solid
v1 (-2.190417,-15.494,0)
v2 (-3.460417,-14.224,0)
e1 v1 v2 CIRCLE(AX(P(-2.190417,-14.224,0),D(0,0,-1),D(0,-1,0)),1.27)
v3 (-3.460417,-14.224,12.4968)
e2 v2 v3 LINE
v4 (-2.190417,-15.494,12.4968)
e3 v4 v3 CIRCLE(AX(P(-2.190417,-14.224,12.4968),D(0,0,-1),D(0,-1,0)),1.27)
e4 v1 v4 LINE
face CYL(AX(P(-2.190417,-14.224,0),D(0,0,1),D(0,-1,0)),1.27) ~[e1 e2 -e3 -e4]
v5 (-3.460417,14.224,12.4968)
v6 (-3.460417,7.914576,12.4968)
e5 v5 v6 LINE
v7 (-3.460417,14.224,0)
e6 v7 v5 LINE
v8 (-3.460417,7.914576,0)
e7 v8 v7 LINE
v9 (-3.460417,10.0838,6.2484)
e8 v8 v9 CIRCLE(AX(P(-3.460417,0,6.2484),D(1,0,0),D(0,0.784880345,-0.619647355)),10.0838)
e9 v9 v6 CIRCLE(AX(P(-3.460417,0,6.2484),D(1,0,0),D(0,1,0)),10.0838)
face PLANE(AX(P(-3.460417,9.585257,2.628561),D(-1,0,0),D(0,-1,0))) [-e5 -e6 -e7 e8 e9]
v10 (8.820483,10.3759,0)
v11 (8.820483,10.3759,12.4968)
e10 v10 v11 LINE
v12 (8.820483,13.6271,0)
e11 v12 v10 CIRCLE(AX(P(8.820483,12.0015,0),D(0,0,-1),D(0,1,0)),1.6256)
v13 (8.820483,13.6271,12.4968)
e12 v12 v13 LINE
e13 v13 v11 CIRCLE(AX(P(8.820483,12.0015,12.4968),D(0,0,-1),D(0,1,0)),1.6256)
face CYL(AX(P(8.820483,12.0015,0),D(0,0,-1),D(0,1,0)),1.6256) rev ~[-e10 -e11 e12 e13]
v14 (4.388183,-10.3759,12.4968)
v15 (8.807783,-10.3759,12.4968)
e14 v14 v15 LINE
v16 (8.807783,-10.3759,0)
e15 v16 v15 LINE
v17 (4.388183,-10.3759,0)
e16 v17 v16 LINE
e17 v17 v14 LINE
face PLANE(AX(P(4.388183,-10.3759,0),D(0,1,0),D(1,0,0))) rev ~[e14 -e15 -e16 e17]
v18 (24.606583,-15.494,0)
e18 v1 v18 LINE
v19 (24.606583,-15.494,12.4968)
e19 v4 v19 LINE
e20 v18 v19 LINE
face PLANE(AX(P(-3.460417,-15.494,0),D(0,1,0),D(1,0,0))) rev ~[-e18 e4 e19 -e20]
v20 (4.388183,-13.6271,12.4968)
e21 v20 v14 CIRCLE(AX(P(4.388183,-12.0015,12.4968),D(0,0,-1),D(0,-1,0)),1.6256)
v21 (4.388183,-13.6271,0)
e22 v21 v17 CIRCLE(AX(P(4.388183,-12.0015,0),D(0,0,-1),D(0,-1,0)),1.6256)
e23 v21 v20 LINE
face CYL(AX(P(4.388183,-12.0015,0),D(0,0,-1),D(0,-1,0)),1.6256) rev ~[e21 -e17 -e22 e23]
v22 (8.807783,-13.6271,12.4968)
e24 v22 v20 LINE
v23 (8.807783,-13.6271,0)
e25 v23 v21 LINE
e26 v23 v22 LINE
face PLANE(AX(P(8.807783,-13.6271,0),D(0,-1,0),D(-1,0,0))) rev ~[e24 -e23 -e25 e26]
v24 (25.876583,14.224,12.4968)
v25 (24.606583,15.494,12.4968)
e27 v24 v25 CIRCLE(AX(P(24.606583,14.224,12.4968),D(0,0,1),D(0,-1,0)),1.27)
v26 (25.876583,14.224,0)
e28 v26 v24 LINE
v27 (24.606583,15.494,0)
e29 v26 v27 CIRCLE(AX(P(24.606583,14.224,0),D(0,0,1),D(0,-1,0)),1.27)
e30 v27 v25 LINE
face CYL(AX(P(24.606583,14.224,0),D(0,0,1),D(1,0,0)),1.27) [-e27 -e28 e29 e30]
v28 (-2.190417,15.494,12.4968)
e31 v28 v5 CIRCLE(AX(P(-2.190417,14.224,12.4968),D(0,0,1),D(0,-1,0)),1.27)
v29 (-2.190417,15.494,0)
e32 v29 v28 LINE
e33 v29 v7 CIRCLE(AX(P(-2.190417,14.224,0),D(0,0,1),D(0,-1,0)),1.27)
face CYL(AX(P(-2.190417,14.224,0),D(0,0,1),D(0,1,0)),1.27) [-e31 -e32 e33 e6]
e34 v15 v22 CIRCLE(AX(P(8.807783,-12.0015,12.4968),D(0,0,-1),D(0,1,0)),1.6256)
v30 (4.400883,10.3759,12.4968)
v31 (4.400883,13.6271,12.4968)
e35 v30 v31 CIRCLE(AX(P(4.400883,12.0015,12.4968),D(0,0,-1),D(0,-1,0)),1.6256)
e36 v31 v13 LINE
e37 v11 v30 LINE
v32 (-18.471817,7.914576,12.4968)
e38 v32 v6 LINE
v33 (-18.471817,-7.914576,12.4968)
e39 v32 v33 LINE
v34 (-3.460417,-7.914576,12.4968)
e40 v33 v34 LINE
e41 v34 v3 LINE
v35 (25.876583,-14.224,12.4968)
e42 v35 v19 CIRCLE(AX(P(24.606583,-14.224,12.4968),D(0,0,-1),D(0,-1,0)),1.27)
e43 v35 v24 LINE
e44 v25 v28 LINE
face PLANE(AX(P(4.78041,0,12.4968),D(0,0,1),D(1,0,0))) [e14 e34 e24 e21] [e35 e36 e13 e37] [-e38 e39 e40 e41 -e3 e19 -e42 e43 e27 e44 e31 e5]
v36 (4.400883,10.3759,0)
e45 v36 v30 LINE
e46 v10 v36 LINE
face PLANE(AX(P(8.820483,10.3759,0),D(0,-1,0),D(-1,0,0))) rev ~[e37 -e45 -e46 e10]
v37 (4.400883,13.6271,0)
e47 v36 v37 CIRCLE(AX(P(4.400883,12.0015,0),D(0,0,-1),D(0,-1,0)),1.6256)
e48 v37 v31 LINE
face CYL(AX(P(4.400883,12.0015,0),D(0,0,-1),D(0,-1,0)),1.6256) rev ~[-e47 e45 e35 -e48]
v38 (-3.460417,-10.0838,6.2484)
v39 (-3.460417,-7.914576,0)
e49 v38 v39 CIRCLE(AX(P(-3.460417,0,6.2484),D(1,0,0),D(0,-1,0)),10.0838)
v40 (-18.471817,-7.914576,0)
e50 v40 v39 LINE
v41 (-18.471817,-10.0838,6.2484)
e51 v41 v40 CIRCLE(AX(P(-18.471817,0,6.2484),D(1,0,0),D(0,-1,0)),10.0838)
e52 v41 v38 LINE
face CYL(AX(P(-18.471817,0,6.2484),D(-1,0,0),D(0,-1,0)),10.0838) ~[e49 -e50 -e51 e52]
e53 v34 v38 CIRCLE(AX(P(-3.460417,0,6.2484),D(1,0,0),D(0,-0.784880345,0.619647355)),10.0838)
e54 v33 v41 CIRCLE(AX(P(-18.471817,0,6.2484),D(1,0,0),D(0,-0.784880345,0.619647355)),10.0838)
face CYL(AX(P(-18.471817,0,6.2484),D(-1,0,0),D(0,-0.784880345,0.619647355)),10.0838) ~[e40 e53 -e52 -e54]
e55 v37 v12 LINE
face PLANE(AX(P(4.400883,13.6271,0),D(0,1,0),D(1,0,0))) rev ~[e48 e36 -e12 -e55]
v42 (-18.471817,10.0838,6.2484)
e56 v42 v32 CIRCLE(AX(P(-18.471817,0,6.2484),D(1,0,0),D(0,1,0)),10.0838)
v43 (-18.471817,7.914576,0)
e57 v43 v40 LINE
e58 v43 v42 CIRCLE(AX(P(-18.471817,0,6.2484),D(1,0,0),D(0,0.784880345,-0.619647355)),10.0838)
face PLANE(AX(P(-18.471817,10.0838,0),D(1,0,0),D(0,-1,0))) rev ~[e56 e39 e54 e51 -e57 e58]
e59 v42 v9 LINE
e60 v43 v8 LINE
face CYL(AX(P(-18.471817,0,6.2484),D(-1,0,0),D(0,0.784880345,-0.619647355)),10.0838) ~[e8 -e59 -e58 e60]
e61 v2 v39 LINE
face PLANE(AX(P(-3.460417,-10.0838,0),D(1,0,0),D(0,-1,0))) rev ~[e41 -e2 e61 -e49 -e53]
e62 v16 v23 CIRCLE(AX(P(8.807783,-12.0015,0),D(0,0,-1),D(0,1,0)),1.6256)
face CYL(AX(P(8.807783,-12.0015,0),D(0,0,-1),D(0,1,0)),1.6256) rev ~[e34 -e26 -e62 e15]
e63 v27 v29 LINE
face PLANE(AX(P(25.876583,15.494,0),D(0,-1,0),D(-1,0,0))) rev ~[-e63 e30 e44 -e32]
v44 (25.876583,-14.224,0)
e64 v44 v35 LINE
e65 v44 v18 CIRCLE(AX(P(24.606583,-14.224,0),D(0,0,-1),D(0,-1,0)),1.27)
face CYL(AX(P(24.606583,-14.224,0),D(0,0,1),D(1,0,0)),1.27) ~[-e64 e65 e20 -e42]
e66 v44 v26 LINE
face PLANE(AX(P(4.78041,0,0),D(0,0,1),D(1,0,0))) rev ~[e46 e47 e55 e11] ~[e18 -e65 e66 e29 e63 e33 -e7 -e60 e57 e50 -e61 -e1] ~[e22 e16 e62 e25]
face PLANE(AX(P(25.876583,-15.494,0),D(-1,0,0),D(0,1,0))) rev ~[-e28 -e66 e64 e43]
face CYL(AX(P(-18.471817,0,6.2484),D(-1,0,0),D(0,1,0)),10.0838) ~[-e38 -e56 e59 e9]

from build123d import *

# Parameters (mm, degrees)
F1_DEPTH = 12.4968
F3_R     = 1.27
F4_DEPTH = 15.0114


with BuildPart() as f1:
    # F0 (on Top) → F1 (new body)
    with BuildSketch(Plane.XY):
        Polygon((25.8765831087, -15.494), (25.8765831087, 15.494), (-3.4604168913, 15.494), (-3.4604168913, 10.0838), (-18.4718168913, 10.0838), (-18.4718168913, -10.0838), (-3.4604168913, -10.0838), (-3.4604168913, -15.494), align=None)
        with BuildLine():
            ThreePointArc((4.3881831087, -13.6271), (2.7625831087, -12.0015), (4.3881831087, -10.3759))
            Line((4.3881831087, -10.3759), (8.8077831087, -10.3759))
            ThreePointArc((8.8077831087, -10.3759), (10.4333831087, -12.0015), (8.8077831087, -13.6271))
            Line((8.8077831087, -13.6271), (4.3881831087, -13.6271))
        make_face(mode=Mode.SUBTRACT)
        with BuildLine():
            ThreePointArc((4.4008831087, 10.3759), (2.7752831087, 12.0015), (4.4008831087, 13.6271))
            Line((4.4008831087, 13.6271), (8.8204831087, 13.6271))
            ThreePointArc((8.8204831087, 13.6271), (10.4460831087, 12.0015), (8.8204831087, 10.3759))
            Line((8.8204831087, 10.3759), (4.4008831087, 10.3759))
        make_face(mode=Mode.SUBTRACT)
    extrude(amount=F1_DEPTH)

    # F3
    f3_edges = [f1.edges().sort_by_distance(p)[0] for p in [
        (-3.460417, -15.494, 6.2484),
        (-3.460417, 15.494, 6.2484),
        (25.876583, -15.494, 6.2484),
        (25.876583, 15.494, 6.2484),
    ]]
    fillet(f3_edges, radius=F3_R)

    # F2 (on face) → F4 (cut)
    with BuildSketch(Plane(origin=(-18.4718168913, 0, 0), x_dir=(0, -1, 0), z_dir=(-1, 0, 0))):
        with BuildLine():
            Line((10.0838, 0), (10.0838, 6.2484))
            ThreePointArc((10.0838, 6.2484), (9.5260702319, 2.9412851884), (7.9145764182, 0))
            Line((7.9145764182, 0), (10.0838, 0))
        make_face()
        with BuildLine():
            ThreePointArc((7.9145764182, 12.4968), (9.5260702319, 9.5555148116), (10.0838, 6.2484))
            Line((10.0838, 6.2484), (10.0838, 12.4968))
            Line((10.0838, 12.4968), (7.9145764182, 12.4968))
        make_face()
        with BuildLine():
            ThreePointArc((-7.9145764182, 0), (0, -3.8354), (7.9145764182, 0))
            Line((7.9145764182, 0), (-7.9145764182, 0))
        make_face()
        with BuildLine():
            ThreePointArc((-10.0838, 6.2484), (-9.5260702319, 9.5555148116), (-7.9145764182, 12.4968))
            Line((-7.9145764182, 12.4968), (-10.0838, 12.4968))
            Line((-10.0838, 12.4968), (-10.0838, 6.2484))
        make_face()
        with BuildLine():
            Line((-10.0838, 0), (-7.9145764182, 0))
            ThreePointArc((-7.9145764182, 0), (-9.5260702319, 2.9412851884), (-10.0838, 6.2484))
            Line((-10.0838, 6.2484), (-10.0838, 0))
        make_face()
    extrude(amount=-F4_DEPTH, mode=Mode.SUBTRACT)


solid = f1.part
